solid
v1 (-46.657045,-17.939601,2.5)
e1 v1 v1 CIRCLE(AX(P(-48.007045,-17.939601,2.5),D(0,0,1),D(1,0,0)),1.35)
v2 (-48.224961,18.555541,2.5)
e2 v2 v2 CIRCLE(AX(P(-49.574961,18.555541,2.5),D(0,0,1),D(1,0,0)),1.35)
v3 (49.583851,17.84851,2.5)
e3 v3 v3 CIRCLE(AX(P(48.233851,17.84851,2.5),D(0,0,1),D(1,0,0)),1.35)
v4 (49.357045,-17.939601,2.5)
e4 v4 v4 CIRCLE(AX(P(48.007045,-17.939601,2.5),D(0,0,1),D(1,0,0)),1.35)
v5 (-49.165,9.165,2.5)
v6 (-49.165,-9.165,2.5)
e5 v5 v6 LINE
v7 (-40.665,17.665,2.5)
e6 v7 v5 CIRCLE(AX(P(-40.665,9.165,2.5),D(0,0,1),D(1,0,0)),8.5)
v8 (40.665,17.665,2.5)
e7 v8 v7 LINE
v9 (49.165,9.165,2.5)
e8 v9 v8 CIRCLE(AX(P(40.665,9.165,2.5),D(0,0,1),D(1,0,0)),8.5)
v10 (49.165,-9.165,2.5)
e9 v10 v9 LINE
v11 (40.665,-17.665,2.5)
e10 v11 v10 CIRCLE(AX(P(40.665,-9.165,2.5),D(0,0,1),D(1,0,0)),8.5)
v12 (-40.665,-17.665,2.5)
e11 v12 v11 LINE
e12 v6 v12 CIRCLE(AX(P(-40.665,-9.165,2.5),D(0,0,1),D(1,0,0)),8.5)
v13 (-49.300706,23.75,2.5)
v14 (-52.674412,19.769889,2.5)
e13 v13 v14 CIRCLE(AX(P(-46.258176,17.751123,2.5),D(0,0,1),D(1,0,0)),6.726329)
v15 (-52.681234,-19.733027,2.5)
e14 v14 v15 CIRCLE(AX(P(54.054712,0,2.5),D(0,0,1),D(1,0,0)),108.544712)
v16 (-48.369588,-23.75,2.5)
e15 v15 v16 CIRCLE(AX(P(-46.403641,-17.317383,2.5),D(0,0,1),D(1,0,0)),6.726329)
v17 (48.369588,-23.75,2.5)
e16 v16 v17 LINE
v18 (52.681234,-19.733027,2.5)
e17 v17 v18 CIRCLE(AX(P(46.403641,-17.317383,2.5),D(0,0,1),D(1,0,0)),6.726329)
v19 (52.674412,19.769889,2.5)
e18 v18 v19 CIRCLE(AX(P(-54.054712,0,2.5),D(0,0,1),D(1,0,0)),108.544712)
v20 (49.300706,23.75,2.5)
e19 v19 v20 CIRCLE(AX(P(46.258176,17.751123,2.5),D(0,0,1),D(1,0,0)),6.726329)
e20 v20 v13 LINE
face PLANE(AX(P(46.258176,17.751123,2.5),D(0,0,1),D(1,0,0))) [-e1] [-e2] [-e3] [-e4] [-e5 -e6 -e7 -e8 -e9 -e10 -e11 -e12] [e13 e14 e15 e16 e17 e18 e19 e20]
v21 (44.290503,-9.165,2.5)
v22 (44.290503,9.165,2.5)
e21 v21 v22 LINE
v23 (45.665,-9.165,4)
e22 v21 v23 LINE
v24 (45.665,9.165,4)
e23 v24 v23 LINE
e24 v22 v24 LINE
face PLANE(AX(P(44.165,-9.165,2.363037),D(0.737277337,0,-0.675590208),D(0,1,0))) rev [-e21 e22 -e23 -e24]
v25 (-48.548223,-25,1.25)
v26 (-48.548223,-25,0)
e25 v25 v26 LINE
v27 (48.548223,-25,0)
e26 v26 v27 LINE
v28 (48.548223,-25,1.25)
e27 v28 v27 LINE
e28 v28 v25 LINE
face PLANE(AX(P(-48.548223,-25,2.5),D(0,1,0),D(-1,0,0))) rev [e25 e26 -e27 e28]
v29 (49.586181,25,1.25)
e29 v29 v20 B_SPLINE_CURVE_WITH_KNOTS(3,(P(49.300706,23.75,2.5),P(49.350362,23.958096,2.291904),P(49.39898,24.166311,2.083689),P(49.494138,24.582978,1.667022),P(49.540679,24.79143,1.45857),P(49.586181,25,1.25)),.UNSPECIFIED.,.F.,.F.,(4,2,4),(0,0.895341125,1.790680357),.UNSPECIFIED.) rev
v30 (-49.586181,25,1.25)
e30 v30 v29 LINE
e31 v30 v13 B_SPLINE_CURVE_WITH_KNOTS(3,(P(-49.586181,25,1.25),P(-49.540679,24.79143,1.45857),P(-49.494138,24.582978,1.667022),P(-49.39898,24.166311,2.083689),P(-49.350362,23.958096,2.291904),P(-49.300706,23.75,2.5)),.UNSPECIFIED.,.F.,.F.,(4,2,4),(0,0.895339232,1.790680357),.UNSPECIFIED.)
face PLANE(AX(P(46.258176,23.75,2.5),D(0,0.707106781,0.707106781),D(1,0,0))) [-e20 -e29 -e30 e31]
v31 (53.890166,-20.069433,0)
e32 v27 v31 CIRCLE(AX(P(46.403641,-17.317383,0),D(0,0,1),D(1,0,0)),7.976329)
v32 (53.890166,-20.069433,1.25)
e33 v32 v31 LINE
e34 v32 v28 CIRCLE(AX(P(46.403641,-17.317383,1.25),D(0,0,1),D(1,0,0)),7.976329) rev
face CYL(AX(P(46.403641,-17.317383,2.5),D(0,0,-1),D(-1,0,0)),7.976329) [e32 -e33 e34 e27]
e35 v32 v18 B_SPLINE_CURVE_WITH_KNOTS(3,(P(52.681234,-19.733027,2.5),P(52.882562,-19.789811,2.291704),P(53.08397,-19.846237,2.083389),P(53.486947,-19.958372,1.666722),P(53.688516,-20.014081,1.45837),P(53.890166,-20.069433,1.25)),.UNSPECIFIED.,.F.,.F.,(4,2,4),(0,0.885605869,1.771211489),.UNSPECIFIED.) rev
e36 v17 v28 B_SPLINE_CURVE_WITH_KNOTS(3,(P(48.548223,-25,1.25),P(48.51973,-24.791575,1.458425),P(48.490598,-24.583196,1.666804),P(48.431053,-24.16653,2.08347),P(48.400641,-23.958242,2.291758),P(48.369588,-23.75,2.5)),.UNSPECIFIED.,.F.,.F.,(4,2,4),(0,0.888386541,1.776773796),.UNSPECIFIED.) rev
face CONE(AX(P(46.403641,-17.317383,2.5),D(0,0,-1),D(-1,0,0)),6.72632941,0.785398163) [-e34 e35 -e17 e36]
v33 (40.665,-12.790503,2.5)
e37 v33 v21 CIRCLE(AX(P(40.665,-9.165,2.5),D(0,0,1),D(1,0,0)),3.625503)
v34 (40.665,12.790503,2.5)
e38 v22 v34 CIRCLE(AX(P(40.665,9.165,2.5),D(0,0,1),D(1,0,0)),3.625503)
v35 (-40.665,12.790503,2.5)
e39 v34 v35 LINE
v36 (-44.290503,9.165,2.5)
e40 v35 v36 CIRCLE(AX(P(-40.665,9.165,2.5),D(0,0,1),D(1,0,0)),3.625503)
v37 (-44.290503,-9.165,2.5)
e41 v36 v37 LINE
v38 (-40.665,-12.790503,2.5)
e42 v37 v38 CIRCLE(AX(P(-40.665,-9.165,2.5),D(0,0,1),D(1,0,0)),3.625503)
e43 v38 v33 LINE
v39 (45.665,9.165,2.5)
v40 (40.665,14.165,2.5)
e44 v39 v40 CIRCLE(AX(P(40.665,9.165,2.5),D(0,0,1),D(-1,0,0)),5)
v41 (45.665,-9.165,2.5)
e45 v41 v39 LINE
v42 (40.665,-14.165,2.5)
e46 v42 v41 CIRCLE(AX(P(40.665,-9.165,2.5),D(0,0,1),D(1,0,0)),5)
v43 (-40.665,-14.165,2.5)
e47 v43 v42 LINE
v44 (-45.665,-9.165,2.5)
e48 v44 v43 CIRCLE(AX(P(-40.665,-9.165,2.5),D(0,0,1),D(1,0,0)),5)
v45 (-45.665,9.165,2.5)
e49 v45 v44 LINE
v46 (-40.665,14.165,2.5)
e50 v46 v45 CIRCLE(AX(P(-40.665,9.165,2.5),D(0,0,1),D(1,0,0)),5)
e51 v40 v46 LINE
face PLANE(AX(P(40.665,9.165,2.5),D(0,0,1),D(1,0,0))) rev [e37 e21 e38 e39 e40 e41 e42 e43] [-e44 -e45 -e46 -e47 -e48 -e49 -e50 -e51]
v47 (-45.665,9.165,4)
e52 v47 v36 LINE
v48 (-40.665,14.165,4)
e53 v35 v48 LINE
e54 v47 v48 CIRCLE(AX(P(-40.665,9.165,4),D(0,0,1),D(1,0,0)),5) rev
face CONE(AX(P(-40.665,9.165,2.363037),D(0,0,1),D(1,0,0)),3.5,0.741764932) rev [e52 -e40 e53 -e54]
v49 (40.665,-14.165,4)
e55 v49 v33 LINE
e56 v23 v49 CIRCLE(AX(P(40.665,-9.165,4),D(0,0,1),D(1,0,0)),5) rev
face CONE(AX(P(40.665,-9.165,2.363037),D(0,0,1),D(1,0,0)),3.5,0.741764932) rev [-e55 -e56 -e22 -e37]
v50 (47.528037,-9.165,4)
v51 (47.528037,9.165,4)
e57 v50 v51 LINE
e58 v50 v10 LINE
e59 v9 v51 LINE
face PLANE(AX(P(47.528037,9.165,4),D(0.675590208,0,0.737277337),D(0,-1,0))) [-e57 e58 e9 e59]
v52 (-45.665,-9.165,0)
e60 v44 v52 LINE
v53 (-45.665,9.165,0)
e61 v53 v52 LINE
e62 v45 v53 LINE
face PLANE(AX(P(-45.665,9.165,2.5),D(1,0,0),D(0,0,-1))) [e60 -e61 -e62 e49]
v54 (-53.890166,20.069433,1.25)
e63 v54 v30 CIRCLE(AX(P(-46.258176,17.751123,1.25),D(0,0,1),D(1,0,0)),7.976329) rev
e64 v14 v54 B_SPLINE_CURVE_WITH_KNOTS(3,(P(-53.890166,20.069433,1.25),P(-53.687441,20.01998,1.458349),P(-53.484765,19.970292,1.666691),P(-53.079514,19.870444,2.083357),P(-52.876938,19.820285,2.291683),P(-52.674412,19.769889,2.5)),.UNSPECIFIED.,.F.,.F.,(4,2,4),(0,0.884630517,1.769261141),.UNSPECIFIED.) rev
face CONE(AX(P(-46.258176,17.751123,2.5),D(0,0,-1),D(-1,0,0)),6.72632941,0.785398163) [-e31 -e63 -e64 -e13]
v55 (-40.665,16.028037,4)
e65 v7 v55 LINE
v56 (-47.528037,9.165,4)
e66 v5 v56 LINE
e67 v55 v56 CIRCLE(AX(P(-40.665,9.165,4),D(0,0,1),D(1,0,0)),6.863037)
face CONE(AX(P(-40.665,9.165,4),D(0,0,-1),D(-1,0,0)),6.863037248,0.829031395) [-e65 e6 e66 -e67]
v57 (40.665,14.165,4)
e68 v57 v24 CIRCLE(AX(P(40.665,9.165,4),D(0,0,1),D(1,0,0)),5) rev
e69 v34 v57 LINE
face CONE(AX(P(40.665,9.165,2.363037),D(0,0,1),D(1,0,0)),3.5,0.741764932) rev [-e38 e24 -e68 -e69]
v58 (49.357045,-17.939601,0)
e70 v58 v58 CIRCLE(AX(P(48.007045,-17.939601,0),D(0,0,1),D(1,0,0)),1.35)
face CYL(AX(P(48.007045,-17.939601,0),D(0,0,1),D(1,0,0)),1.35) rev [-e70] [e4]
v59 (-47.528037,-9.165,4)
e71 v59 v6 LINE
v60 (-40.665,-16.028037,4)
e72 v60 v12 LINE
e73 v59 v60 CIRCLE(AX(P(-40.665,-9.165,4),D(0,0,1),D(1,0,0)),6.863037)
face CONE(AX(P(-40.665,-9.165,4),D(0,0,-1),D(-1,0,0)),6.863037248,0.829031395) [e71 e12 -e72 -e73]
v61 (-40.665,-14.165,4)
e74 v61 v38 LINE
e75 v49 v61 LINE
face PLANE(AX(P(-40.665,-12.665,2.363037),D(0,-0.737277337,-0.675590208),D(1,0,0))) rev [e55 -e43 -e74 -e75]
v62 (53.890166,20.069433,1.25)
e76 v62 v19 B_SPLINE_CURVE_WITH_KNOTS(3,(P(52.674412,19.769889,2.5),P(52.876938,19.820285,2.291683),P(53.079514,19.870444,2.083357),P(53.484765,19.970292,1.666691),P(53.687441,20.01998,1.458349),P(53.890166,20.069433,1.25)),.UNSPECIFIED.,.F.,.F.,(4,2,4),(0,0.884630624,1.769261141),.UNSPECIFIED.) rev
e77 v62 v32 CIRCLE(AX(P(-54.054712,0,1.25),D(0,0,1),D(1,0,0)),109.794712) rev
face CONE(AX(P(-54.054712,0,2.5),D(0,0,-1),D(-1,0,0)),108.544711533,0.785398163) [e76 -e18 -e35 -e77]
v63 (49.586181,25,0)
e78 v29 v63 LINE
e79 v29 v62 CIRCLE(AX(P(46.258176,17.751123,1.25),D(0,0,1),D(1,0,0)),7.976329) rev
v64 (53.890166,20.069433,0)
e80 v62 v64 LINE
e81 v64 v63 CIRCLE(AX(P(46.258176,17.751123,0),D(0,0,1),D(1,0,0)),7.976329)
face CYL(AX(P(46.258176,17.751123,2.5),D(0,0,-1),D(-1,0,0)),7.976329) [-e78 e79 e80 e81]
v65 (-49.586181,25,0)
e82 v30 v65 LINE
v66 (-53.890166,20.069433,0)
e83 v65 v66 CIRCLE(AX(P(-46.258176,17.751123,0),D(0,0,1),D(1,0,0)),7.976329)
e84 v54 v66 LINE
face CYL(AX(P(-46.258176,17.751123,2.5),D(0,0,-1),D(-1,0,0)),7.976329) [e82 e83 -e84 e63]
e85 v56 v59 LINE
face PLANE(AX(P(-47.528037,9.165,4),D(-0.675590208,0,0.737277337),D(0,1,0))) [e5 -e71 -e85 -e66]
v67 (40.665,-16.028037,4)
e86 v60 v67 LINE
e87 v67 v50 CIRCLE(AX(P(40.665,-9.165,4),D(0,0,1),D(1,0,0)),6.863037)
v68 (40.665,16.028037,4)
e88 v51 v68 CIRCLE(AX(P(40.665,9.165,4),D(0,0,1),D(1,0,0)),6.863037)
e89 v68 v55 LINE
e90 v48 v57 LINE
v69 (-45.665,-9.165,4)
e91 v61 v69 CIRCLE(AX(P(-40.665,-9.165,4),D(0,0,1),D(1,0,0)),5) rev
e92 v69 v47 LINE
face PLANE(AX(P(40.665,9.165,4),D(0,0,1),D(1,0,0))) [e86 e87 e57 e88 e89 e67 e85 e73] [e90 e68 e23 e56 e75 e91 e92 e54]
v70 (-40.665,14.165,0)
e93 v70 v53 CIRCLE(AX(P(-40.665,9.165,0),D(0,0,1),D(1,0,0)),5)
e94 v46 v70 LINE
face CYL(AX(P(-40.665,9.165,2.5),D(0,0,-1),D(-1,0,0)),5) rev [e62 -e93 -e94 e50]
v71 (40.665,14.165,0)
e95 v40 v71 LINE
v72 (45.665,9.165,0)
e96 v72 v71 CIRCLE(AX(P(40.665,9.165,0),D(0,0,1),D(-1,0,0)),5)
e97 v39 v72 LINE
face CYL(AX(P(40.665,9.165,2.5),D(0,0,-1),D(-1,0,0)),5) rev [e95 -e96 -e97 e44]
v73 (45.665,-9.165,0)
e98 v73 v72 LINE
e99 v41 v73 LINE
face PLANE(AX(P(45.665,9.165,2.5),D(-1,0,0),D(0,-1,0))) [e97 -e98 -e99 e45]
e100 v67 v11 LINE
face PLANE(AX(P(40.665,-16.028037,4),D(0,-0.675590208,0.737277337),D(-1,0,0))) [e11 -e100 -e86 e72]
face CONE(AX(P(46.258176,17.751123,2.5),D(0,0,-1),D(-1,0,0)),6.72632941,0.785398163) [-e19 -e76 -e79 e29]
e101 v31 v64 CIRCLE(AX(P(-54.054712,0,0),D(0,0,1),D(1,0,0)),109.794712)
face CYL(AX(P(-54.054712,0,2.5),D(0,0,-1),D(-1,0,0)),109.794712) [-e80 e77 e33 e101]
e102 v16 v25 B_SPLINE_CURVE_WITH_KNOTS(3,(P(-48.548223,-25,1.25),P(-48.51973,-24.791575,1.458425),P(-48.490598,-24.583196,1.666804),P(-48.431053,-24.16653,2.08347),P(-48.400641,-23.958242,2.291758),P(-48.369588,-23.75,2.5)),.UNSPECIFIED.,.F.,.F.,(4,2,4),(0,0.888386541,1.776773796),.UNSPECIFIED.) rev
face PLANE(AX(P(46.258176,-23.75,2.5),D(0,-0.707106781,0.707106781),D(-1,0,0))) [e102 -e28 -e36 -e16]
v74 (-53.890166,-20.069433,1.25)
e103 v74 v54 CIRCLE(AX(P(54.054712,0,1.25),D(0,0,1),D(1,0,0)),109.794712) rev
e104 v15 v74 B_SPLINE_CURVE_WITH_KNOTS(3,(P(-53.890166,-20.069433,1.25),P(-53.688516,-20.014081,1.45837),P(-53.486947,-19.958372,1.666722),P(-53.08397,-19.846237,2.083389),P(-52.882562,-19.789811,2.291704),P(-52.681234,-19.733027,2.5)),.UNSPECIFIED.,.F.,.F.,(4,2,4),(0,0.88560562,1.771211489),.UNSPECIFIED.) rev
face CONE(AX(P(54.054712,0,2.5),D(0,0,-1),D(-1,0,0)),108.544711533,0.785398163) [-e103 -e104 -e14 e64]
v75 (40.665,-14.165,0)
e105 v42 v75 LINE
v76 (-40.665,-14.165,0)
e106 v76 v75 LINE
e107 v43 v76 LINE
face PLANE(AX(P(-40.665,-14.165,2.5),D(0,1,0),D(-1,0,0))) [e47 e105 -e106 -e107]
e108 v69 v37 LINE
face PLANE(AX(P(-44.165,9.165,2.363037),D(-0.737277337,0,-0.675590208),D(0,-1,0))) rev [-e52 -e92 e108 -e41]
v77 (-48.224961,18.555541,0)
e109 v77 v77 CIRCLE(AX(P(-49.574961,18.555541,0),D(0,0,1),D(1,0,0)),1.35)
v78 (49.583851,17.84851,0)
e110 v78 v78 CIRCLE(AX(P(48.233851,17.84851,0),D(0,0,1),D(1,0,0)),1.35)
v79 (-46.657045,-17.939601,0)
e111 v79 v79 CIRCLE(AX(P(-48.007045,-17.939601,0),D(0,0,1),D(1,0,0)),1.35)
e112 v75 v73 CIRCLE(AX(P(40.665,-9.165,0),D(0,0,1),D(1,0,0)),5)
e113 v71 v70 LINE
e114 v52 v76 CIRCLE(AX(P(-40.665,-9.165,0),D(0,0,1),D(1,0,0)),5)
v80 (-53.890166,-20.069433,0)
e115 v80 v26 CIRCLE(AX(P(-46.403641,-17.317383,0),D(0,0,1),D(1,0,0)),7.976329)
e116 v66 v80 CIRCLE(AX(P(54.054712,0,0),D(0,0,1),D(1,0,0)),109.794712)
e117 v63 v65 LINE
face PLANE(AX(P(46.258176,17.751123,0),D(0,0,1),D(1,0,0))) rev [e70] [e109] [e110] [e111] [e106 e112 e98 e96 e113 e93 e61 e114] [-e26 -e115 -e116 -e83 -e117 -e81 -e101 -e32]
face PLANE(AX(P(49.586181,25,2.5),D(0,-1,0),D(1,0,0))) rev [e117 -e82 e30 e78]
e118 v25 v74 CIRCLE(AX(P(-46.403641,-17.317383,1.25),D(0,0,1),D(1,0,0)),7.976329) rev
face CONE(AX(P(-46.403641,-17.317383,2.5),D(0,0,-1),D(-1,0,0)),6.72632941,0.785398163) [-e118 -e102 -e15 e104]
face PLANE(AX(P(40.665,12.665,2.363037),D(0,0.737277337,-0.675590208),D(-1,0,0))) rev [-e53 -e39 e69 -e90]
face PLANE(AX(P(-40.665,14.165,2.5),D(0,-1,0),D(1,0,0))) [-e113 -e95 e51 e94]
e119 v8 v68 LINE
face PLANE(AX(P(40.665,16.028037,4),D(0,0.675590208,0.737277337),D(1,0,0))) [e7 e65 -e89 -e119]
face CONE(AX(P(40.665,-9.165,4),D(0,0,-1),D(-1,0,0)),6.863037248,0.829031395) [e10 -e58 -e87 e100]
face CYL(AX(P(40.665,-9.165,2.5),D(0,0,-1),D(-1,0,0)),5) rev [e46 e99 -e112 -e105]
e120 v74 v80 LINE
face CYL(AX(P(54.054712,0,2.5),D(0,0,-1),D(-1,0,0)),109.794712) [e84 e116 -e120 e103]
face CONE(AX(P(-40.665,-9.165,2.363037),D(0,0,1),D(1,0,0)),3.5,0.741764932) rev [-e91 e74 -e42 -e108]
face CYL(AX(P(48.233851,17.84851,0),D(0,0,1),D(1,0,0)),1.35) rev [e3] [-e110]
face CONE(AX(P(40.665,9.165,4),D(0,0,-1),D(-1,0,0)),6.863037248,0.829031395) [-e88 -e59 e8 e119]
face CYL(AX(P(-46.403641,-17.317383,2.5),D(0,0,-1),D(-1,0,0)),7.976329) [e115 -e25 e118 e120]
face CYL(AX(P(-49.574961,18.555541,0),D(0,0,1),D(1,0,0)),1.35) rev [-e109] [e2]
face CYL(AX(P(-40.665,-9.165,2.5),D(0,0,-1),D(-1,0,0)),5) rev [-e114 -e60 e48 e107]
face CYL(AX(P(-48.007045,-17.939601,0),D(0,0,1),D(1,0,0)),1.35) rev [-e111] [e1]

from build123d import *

# Parameters (mm, degrees)
BOSS_EXTRUDE1_DEPTH = 2.5
CHAMFER1_SIZE       = 1.25
SKETCH2_R           = 1.35
CUT_EXTRUDE1_DEPTH  = 62.140801434
BOSS_EXTRUDE2_DEPTH = 1.5
CHAMFER2_SIZE       = 1.5
CHAMFER2_SIZE_2     = 1.636962752


with BuildPart() as part:
    # Sketch1 → Boss-Extrude1 (new body)
    with BuildSketch(Plane.XY):
        with BuildLine():
            Line((49.586181166, 25), (-49.586181166, 25))
            ThreePointArc((-49.586181166, 25), (-52.267168909, 22.996486369), (-53.890165841, 20.069432712))
            ThreePointArc((-53.890165841, 20.069432712), (-55.74, 0), (-53.890165841, -20.069432712))
            ThreePointArc((-53.890165841, -20.069432712), (-51.813555608, -23.178667596), (-48.548222563, -25))
            Line((-48.548222563, -25), (48.548222563, -25))
            ThreePointArc((48.548222563, -25), (51.813555608, -23.178667596), (53.890165841, -20.069432712))
            ThreePointArc((53.890165841, -20.069432712), (55.74, 0), (53.890165841, 20.069432712))
            ThreePointArc((53.890165841, 20.069432712), (52.267168909, 22.996486369), (49.586181166, 25))
        make_face()
        with BuildLine():
            Line((-40.665, 14.165), (40.665, 14.165))
            ThreePointArc((40.665, 14.165), (44.200533906, 12.700533906), (45.665, 9.165))
            Line((45.665, 9.165), (45.665, -9.165))
            ThreePointArc((45.665, -9.165), (44.200533906, -12.700533906), (40.665, -14.165))
            Line((40.665, -14.165), (-40.665, -14.165))
            ThreePointArc((-40.665, -14.165), (-44.200533906, -12.700533906), (-45.665, -9.165))
            Line((-45.665, -9.165), (-45.665, 9.165))
            ThreePointArc((-45.665, 9.165), (-44.200533906, 12.700533906), (-40.665, 14.165))
        make_face(mode=Mode.SUBTRACT)
    extrude(amount=BOSS_EXTRUDE1_DEPTH)

    # Chamfer1
    chamfer1_edges = [part.edges().sort_by_distance(p)[0] for p in [
        (0, 25, 2.5),
    ]]
    chamfer(chamfer1_edges, length=CHAMFER1_SIZE)
    chamfer1_2_edges = [part.edges().sort_by_distance(p)[0] for p in [
        (-55.74, 0, 2.5),
    ]]
    chamfer(chamfer1_2_edges, length=CHAMFER1_SIZE)
    chamfer1_3_edges = [part.edges().sort_by_distance(p)[0] for p in [
        (0, -25, 2.5),
    ]]
    chamfer(chamfer1_3_edges, length=CHAMFER1_SIZE)
    chamfer1_4_edges = [part.edges().sort_by_distance(p)[0] for p in [
        (55.74, 0, 2.5),
    ]]
    chamfer(chamfer1_4_edges, length=CHAMFER1_SIZE)
    chamfer1_5_edges = [part.edges().sort_by_distance(p)[0] for p in [
        (51.737177521, 23.54787863, 2.5),
    ]]
    chamfer(chamfer1_5_edges, length=CHAMFER1_SIZE)
    chamfer1_6_edges = [part.edges().sort_by_distance(p)[0] for p in [
        (-51.737177521, 23.54787863, 2.5),
    ]]
    chamfer(chamfer1_6_edges, length=CHAMFER1_SIZE)
    chamfer1_7_edges = [part.edges().sort_by_distance(p)[0] for p in [
        (-51.5906008, -23.376861633, 2.5),
    ]]
    chamfer(chamfer1_7_edges, length=CHAMFER1_SIZE)
    chamfer1_8_edges = [part.edges().sort_by_distance(p)[0] for p in [
        (51.5906008, -23.376861633, 2.5),
    ]]
    chamfer(chamfer1_8_edges, length=CHAMFER1_SIZE)

    # Sketch2 → Cut-Extrude1 (cut, through all)
    with BuildSketch(Plane.XY.offset(2.5)):
        with Locations((-48.007044757, -17.939600751)):
            Circle(SKETCH2_R)
        with Locations((-49.574960594, 18.555541297)):
            Circle(SKETCH2_R)
        with Locations((48.233851408, 17.848510138)):
            Circle(SKETCH2_R)
        with Locations((48.007044757, -17.939600751)):
            Circle(SKETCH2_R)
    extrude(amount=-CUT_EXTRUDE1_DEPTH, mode=Mode.SUBTRACT)

    # Sketch3 → Boss-Extrude2 (add)
    with BuildSketch(Plane.XY.offset(2.5)):
        with BuildLine():
            Line((49.165, -9.165), (49.165, 9.165))
            ThreePointArc((49.165, 9.165), (46.67540764, 15.17540764), (40.665, 17.665))
            Line((40.665, 17.665), (-40.665, 17.665))
            ThreePointArc((-40.665, 17.665), (-46.67540764, 15.17540764), (-49.165, 9.165))
            Line((-49.165, 9.165), (-49.165, -9.165))
            ThreePointArc((-49.165, -9.165), (-46.67540764, -15.17540764), (-40.665, -17.665))
            Line((-40.665, -17.665), (40.665, -17.665))
            ThreePointArc((40.665, -17.665), (46.67540764, -15.17540764), (49.165, -9.165))
        make_face()
        with BuildLine():
            Line((44.165, -9.165), (44.165, 9.165))
            ThreePointArc((44.165, 9.165), (43.139873734, 11.639873734), (40.665, 12.665))
            Line((40.665, 12.665), (-40.665, 12.665))
            ThreePointArc((-40.665, 12.665), (-43.139873734, 11.639873734), (-44.165, 9.165))
            Line((-44.165, 9.165), (-44.165, -9.165))
            ThreePointArc((-44.165, -9.165), (-43.139873734, -11.639873734), (-40.665, -12.665))
            Line((-40.665, -12.665), (40.665, -12.665))
            ThreePointArc((40.665, -12.665), (43.139873734, -11.639873734), (44.165, -9.165))
        make_face(mode=Mode.SUBTRACT)
    extrude(amount=BOSS_EXTRUDE2_DEPTH)

    # Chamfer2
    # the kernel refuses this chamfer: 1.636962752, 1.5 mm, written as the material it takes off along each edge
    with BuildSketch(Plane(origin=(-40.665, 9.165, 4), x_dir=(0, 1, 0), z_dir=(1, 0, 0))) as chamfer2_piece_1:
        Polygon((3.5 + CHAMFER2_SIZE, 0), (3.5, -CHAMFER2_SIZE_2), (3.5, 0), align=None)
    revolve(axis=Axis((-40.665, 9.165, 4), (0, 0, 1)), revolution_arc=90, mode=Mode.SUBTRACT)
    with BuildSketch(Plane(origin=(-44.165, 9.165, 4), x_dir=(-0.9995117036729907, 0, 0.031246667353746753), z_dir=(0, -1, 0)), Plane(origin=(44.165, -9.165, 4), x_dir=(0.9995117036729907, 0, 0.031246667353746753), z_dir=(0, 1, 0))) as chamfer2_piece_2:
        Polygon((CHAMFER2_SIZE * 0.999511703673, CHAMFER2_SIZE * 0.0312466673537), (-CHAMFER2_SIZE_2 * 0.0312466673462, CHAMFER2_SIZE_2 * 0.999511703431), (0, 0), align=None)
    extrude(amount=18.33, mode=Mode.SUBTRACT)
    with BuildSketch(Plane(origin=(-40.665, -9.165, 4), x_dir=(-1, 0, 0), z_dir=(0, 1, 0))) as chamfer2_piece_3:
        Polygon((3.5 + CHAMFER2_SIZE, 0), (3.5, -CHAMFER2_SIZE_2), (3.5, 0), align=None)
    revolve(axis=Axis((-40.665, -9.165, 4), (0, 0, 1)), revolution_arc=90, mode=Mode.SUBTRACT)
    with BuildSketch(Plane(origin=(-40.665, -12.665, 4), x_dir=(0, -0.9995117036729907, 0.031246667353746788), z_dir=(1, 0, 0)), Plane(origin=(40.665, 12.665, 4), x_dir=(0, 0.9995117036729907, 0.031246667353746788), z_dir=(-1, 0, 0))) as chamfer2_piece_4:
        Polygon((CHAMFER2_SIZE * 0.999511703673, CHAMFER2_SIZE * 0.0312466673537), (-CHAMFER2_SIZE_2 * 0.0312466673462, CHAMFER2_SIZE_2 * 0.999511703431), (0, 0), align=None)
    extrude(amount=81.33, mode=Mode.SUBTRACT)
    with BuildSketch(Plane(origin=(40.665, -9.165, 4), x_dir=(0, -1, 0), z_dir=(-1, 0, 0))) as chamfer2_piece_5:
        Polygon((3.5 + CHAMFER2_SIZE, 0), (3.5, -CHAMFER2_SIZE_2), (3.5, 0), align=None)
    revolve(axis=Axis((40.665, -9.165, 4), (0, 0, 1)), revolution_arc=90, mode=Mode.SUBTRACT)
    with BuildSketch(Plane(origin=(40.665, 9.165, 4), x_dir=(1, 0, 0), z_dir=(0, -1, 0))) as chamfer2_piece_6:
        Polygon((3.5 + CHAMFER2_SIZE, 0), (3.5, -CHAMFER2_SIZE_2), (3.5, 0), align=None)
    revolve(axis=Axis((40.665, 9.165, 4), (0, 0, 1)), revolution_arc=90, mode=Mode.SUBTRACT)
    with BuildSketch(Plane(origin=(49.165, -9.165, 4), x_dir=(0.03124666735374564, 0, -0.9995117036729907), z_dir=(0, 1, 0))) as chamfer2_piece_7_section:
        Polygon((CHAMFER2_SIZE * 0.999511703673, CHAMFER2_SIZE * 0.0312466673537), (-CHAMFER2_SIZE_2 * 0.0312466673462, CHAMFER2_SIZE_2 * 0.999511703431), (0, 0), align=None)
    chamfer2_piece_7 = extrude(amount=18.33, mode=Mode.PRIVATE)
    chamfer2_piece_7 = split(chamfer2_piece_7, bisect_by=Plane(origin=(48.622856571, 0, 2.5), z_dir=(0, 0, 1)), keep=Keep.TOP, mode=Mode.PRIVATE)
    add(chamfer2_piece_7, mode=Mode.SUBTRACT)
    with BuildSketch(Plane(origin=(40.665, -9.165, 4), x_dir=(0, -1, 0), z_dir=(-1, 0, 0))) as chamfer2_piece_8_section:
        Polygon((8.5, -CHAMFER2_SIZE), (8.5 - CHAMFER2_SIZE_2, 0), (8.5, 0), align=None)
    chamfer2_piece_8 = revolve(axis=Axis((40.665, -9.165, 4), (0, 0, 1)), revolution_arc=90, mode=Mode.PRIVATE)
    chamfer2_piece_8 = split(chamfer2_piece_8, bisect_by=Plane(origin=(46.09185199, -14.59185199, 2.5), z_dir=(0, 0, 1)), keep=Keep.TOP, mode=Mode.PRIVATE)
    add(chamfer2_piece_8, mode=Mode.SUBTRACT)
    with BuildSketch(Plane(origin=(-40.665, -17.665, 4), x_dir=(0, -0.03124666735374564, -0.9995117036729907), z_dir=(1, 0, 0))) as chamfer2_piece_9_section:
        Polygon((CHAMFER2_SIZE * 0.999511703673, CHAMFER2_SIZE * 0.0312466673537), (-CHAMFER2_SIZE_2 * 0.0312466673462, CHAMFER2_SIZE_2 * 0.999511703431), (0, 0), align=None)
    chamfer2_piece_9 = extrude(amount=81.33, mode=Mode.PRIVATE)
    chamfer2_piece_9 = split(chamfer2_piece_9, bisect_by=Plane(origin=(0, -17.122856571, 2.5), z_dir=(0, 0, 1)), keep=Keep.TOP, mode=Mode.PRIVATE)
    add(chamfer2_piece_9, mode=Mode.SUBTRACT)
    with BuildSketch(Plane(origin=(-40.665, -9.165, 4), x_dir=(-1, 0, 0), z_dir=(0, 1, 0))) as chamfer2_piece_10_section:
        Polygon((8.5, -CHAMFER2_SIZE), (8.5 - CHAMFER2_SIZE_2, 0), (8.5, 0), align=None)
    chamfer2_piece_10 = revolve(axis=Axis((-40.665, -9.165, 4), (0, 0, 1)), revolution_arc=90, mode=Mode.PRIVATE)
    chamfer2_piece_10 = split(chamfer2_piece_10, bisect_by=Plane(origin=(-46.09185199, -14.59185199, 2.5), z_dir=(0, 0, 1)), keep=Keep.TOP, mode=Mode.PRIVATE)
    add(chamfer2_piece_10, mode=Mode.SUBTRACT)
    with BuildSketch(Plane(origin=(-49.165, 9.165, 4), x_dir=(-0.03124666735374564, 0, -0.9995117036729907), z_dir=(0, -1, 0))) as chamfer2_piece_11_section:
        Polygon((CHAMFER2_SIZE * 0.999511703673, CHAMFER2_SIZE * 0.0312466673537), (-CHAMFER2_SIZE_2 * 0.0312466673462, CHAMFER2_SIZE_2 * 0.999511703431), (0, 0), align=None)
    chamfer2_piece_11 = extrude(amount=18.33, mode=Mode.PRIVATE)
    chamfer2_piece_11 = split(chamfer2_piece_11, bisect_by=Plane(origin=(-48.622856571, 0, 2.5), z_dir=(0, 0, 1)), keep=Keep.TOP, mode=Mode.PRIVATE)
    add(chamfer2_piece_11, mode=Mode.SUBTRACT)
    with BuildSketch(Plane(origin=(-40.665, 9.165, 4), x_dir=(0, 1, 0), z_dir=(1, 0, 0))) as chamfer2_piece_12_section:
        Polygon((8.5, -CHAMFER2_SIZE), (8.5 - CHAMFER2_SIZE_2, 0), (8.5, 0), align=None)
    chamfer2_piece_12 = revolve(axis=Axis((-40.665, 9.165, 4), (0, 0, 1)), revolution_arc=90, mode=Mode.PRIVATE)
    chamfer2_piece_12 = split(chamfer2_piece_12, bisect_by=Plane(origin=(-46.09185199, 14.59185199, 2.5), z_dir=(0, 0, 1)), keep=Keep.TOP, mode=Mode.PRIVATE)
    add(chamfer2_piece_12, mode=Mode.SUBTRACT)
    with BuildSketch(Plane(origin=(40.665, 17.665, 4), x_dir=(0, 0.03124666735374564, -0.9995117036729907), z_dir=(-1, 0, 0))) as chamfer2_piece_13_section:
        Polygon((CHAMFER2_SIZE * 0.999511703673, CHAMFER2_SIZE * 0.0312466673537), (-CHAMFER2_SIZE_2 * 0.0312466673462, CHAMFER2_SIZE_2 * 0.999511703431), (0, 0), align=None)
    chamfer2_piece_13 = extrude(amount=81.33, mode=Mode.PRIVATE)
    chamfer2_piece_13 = split(chamfer2_piece_13, bisect_by=Plane(origin=(0, 17.122856571, 2.5), z_dir=(0, 0, 1)), keep=Keep.TOP, mode=Mode.PRIVATE)
    add(chamfer2_piece_13, mode=Mode.SUBTRACT)
    with BuildSketch(Plane(origin=(40.665, 9.165, 4), x_dir=(1, 0, 0), z_dir=(0, -1, 0))) as chamfer2_piece_14_section:
        Polygon((8.5, -CHAMFER2_SIZE), (8.5 - CHAMFER2_SIZE_2, 0), (8.5, 0), align=None)
    chamfer2_piece_14 = revolve(axis=Axis((40.665, 9.165, 4), (0, 0, 1)), revolution_arc=90, mode=Mode.PRIVATE)
    chamfer2_piece_14 = split(chamfer2_piece_14, bisect_by=Plane(origin=(46.09185199, 14.59185199, 2.5), z_dir=(0, 0, 1)), keep=Keep.TOP, mode=Mode.PRIVATE)
    add(chamfer2_piece_14, mode=Mode.SUBTRACT)


solid = part.part
